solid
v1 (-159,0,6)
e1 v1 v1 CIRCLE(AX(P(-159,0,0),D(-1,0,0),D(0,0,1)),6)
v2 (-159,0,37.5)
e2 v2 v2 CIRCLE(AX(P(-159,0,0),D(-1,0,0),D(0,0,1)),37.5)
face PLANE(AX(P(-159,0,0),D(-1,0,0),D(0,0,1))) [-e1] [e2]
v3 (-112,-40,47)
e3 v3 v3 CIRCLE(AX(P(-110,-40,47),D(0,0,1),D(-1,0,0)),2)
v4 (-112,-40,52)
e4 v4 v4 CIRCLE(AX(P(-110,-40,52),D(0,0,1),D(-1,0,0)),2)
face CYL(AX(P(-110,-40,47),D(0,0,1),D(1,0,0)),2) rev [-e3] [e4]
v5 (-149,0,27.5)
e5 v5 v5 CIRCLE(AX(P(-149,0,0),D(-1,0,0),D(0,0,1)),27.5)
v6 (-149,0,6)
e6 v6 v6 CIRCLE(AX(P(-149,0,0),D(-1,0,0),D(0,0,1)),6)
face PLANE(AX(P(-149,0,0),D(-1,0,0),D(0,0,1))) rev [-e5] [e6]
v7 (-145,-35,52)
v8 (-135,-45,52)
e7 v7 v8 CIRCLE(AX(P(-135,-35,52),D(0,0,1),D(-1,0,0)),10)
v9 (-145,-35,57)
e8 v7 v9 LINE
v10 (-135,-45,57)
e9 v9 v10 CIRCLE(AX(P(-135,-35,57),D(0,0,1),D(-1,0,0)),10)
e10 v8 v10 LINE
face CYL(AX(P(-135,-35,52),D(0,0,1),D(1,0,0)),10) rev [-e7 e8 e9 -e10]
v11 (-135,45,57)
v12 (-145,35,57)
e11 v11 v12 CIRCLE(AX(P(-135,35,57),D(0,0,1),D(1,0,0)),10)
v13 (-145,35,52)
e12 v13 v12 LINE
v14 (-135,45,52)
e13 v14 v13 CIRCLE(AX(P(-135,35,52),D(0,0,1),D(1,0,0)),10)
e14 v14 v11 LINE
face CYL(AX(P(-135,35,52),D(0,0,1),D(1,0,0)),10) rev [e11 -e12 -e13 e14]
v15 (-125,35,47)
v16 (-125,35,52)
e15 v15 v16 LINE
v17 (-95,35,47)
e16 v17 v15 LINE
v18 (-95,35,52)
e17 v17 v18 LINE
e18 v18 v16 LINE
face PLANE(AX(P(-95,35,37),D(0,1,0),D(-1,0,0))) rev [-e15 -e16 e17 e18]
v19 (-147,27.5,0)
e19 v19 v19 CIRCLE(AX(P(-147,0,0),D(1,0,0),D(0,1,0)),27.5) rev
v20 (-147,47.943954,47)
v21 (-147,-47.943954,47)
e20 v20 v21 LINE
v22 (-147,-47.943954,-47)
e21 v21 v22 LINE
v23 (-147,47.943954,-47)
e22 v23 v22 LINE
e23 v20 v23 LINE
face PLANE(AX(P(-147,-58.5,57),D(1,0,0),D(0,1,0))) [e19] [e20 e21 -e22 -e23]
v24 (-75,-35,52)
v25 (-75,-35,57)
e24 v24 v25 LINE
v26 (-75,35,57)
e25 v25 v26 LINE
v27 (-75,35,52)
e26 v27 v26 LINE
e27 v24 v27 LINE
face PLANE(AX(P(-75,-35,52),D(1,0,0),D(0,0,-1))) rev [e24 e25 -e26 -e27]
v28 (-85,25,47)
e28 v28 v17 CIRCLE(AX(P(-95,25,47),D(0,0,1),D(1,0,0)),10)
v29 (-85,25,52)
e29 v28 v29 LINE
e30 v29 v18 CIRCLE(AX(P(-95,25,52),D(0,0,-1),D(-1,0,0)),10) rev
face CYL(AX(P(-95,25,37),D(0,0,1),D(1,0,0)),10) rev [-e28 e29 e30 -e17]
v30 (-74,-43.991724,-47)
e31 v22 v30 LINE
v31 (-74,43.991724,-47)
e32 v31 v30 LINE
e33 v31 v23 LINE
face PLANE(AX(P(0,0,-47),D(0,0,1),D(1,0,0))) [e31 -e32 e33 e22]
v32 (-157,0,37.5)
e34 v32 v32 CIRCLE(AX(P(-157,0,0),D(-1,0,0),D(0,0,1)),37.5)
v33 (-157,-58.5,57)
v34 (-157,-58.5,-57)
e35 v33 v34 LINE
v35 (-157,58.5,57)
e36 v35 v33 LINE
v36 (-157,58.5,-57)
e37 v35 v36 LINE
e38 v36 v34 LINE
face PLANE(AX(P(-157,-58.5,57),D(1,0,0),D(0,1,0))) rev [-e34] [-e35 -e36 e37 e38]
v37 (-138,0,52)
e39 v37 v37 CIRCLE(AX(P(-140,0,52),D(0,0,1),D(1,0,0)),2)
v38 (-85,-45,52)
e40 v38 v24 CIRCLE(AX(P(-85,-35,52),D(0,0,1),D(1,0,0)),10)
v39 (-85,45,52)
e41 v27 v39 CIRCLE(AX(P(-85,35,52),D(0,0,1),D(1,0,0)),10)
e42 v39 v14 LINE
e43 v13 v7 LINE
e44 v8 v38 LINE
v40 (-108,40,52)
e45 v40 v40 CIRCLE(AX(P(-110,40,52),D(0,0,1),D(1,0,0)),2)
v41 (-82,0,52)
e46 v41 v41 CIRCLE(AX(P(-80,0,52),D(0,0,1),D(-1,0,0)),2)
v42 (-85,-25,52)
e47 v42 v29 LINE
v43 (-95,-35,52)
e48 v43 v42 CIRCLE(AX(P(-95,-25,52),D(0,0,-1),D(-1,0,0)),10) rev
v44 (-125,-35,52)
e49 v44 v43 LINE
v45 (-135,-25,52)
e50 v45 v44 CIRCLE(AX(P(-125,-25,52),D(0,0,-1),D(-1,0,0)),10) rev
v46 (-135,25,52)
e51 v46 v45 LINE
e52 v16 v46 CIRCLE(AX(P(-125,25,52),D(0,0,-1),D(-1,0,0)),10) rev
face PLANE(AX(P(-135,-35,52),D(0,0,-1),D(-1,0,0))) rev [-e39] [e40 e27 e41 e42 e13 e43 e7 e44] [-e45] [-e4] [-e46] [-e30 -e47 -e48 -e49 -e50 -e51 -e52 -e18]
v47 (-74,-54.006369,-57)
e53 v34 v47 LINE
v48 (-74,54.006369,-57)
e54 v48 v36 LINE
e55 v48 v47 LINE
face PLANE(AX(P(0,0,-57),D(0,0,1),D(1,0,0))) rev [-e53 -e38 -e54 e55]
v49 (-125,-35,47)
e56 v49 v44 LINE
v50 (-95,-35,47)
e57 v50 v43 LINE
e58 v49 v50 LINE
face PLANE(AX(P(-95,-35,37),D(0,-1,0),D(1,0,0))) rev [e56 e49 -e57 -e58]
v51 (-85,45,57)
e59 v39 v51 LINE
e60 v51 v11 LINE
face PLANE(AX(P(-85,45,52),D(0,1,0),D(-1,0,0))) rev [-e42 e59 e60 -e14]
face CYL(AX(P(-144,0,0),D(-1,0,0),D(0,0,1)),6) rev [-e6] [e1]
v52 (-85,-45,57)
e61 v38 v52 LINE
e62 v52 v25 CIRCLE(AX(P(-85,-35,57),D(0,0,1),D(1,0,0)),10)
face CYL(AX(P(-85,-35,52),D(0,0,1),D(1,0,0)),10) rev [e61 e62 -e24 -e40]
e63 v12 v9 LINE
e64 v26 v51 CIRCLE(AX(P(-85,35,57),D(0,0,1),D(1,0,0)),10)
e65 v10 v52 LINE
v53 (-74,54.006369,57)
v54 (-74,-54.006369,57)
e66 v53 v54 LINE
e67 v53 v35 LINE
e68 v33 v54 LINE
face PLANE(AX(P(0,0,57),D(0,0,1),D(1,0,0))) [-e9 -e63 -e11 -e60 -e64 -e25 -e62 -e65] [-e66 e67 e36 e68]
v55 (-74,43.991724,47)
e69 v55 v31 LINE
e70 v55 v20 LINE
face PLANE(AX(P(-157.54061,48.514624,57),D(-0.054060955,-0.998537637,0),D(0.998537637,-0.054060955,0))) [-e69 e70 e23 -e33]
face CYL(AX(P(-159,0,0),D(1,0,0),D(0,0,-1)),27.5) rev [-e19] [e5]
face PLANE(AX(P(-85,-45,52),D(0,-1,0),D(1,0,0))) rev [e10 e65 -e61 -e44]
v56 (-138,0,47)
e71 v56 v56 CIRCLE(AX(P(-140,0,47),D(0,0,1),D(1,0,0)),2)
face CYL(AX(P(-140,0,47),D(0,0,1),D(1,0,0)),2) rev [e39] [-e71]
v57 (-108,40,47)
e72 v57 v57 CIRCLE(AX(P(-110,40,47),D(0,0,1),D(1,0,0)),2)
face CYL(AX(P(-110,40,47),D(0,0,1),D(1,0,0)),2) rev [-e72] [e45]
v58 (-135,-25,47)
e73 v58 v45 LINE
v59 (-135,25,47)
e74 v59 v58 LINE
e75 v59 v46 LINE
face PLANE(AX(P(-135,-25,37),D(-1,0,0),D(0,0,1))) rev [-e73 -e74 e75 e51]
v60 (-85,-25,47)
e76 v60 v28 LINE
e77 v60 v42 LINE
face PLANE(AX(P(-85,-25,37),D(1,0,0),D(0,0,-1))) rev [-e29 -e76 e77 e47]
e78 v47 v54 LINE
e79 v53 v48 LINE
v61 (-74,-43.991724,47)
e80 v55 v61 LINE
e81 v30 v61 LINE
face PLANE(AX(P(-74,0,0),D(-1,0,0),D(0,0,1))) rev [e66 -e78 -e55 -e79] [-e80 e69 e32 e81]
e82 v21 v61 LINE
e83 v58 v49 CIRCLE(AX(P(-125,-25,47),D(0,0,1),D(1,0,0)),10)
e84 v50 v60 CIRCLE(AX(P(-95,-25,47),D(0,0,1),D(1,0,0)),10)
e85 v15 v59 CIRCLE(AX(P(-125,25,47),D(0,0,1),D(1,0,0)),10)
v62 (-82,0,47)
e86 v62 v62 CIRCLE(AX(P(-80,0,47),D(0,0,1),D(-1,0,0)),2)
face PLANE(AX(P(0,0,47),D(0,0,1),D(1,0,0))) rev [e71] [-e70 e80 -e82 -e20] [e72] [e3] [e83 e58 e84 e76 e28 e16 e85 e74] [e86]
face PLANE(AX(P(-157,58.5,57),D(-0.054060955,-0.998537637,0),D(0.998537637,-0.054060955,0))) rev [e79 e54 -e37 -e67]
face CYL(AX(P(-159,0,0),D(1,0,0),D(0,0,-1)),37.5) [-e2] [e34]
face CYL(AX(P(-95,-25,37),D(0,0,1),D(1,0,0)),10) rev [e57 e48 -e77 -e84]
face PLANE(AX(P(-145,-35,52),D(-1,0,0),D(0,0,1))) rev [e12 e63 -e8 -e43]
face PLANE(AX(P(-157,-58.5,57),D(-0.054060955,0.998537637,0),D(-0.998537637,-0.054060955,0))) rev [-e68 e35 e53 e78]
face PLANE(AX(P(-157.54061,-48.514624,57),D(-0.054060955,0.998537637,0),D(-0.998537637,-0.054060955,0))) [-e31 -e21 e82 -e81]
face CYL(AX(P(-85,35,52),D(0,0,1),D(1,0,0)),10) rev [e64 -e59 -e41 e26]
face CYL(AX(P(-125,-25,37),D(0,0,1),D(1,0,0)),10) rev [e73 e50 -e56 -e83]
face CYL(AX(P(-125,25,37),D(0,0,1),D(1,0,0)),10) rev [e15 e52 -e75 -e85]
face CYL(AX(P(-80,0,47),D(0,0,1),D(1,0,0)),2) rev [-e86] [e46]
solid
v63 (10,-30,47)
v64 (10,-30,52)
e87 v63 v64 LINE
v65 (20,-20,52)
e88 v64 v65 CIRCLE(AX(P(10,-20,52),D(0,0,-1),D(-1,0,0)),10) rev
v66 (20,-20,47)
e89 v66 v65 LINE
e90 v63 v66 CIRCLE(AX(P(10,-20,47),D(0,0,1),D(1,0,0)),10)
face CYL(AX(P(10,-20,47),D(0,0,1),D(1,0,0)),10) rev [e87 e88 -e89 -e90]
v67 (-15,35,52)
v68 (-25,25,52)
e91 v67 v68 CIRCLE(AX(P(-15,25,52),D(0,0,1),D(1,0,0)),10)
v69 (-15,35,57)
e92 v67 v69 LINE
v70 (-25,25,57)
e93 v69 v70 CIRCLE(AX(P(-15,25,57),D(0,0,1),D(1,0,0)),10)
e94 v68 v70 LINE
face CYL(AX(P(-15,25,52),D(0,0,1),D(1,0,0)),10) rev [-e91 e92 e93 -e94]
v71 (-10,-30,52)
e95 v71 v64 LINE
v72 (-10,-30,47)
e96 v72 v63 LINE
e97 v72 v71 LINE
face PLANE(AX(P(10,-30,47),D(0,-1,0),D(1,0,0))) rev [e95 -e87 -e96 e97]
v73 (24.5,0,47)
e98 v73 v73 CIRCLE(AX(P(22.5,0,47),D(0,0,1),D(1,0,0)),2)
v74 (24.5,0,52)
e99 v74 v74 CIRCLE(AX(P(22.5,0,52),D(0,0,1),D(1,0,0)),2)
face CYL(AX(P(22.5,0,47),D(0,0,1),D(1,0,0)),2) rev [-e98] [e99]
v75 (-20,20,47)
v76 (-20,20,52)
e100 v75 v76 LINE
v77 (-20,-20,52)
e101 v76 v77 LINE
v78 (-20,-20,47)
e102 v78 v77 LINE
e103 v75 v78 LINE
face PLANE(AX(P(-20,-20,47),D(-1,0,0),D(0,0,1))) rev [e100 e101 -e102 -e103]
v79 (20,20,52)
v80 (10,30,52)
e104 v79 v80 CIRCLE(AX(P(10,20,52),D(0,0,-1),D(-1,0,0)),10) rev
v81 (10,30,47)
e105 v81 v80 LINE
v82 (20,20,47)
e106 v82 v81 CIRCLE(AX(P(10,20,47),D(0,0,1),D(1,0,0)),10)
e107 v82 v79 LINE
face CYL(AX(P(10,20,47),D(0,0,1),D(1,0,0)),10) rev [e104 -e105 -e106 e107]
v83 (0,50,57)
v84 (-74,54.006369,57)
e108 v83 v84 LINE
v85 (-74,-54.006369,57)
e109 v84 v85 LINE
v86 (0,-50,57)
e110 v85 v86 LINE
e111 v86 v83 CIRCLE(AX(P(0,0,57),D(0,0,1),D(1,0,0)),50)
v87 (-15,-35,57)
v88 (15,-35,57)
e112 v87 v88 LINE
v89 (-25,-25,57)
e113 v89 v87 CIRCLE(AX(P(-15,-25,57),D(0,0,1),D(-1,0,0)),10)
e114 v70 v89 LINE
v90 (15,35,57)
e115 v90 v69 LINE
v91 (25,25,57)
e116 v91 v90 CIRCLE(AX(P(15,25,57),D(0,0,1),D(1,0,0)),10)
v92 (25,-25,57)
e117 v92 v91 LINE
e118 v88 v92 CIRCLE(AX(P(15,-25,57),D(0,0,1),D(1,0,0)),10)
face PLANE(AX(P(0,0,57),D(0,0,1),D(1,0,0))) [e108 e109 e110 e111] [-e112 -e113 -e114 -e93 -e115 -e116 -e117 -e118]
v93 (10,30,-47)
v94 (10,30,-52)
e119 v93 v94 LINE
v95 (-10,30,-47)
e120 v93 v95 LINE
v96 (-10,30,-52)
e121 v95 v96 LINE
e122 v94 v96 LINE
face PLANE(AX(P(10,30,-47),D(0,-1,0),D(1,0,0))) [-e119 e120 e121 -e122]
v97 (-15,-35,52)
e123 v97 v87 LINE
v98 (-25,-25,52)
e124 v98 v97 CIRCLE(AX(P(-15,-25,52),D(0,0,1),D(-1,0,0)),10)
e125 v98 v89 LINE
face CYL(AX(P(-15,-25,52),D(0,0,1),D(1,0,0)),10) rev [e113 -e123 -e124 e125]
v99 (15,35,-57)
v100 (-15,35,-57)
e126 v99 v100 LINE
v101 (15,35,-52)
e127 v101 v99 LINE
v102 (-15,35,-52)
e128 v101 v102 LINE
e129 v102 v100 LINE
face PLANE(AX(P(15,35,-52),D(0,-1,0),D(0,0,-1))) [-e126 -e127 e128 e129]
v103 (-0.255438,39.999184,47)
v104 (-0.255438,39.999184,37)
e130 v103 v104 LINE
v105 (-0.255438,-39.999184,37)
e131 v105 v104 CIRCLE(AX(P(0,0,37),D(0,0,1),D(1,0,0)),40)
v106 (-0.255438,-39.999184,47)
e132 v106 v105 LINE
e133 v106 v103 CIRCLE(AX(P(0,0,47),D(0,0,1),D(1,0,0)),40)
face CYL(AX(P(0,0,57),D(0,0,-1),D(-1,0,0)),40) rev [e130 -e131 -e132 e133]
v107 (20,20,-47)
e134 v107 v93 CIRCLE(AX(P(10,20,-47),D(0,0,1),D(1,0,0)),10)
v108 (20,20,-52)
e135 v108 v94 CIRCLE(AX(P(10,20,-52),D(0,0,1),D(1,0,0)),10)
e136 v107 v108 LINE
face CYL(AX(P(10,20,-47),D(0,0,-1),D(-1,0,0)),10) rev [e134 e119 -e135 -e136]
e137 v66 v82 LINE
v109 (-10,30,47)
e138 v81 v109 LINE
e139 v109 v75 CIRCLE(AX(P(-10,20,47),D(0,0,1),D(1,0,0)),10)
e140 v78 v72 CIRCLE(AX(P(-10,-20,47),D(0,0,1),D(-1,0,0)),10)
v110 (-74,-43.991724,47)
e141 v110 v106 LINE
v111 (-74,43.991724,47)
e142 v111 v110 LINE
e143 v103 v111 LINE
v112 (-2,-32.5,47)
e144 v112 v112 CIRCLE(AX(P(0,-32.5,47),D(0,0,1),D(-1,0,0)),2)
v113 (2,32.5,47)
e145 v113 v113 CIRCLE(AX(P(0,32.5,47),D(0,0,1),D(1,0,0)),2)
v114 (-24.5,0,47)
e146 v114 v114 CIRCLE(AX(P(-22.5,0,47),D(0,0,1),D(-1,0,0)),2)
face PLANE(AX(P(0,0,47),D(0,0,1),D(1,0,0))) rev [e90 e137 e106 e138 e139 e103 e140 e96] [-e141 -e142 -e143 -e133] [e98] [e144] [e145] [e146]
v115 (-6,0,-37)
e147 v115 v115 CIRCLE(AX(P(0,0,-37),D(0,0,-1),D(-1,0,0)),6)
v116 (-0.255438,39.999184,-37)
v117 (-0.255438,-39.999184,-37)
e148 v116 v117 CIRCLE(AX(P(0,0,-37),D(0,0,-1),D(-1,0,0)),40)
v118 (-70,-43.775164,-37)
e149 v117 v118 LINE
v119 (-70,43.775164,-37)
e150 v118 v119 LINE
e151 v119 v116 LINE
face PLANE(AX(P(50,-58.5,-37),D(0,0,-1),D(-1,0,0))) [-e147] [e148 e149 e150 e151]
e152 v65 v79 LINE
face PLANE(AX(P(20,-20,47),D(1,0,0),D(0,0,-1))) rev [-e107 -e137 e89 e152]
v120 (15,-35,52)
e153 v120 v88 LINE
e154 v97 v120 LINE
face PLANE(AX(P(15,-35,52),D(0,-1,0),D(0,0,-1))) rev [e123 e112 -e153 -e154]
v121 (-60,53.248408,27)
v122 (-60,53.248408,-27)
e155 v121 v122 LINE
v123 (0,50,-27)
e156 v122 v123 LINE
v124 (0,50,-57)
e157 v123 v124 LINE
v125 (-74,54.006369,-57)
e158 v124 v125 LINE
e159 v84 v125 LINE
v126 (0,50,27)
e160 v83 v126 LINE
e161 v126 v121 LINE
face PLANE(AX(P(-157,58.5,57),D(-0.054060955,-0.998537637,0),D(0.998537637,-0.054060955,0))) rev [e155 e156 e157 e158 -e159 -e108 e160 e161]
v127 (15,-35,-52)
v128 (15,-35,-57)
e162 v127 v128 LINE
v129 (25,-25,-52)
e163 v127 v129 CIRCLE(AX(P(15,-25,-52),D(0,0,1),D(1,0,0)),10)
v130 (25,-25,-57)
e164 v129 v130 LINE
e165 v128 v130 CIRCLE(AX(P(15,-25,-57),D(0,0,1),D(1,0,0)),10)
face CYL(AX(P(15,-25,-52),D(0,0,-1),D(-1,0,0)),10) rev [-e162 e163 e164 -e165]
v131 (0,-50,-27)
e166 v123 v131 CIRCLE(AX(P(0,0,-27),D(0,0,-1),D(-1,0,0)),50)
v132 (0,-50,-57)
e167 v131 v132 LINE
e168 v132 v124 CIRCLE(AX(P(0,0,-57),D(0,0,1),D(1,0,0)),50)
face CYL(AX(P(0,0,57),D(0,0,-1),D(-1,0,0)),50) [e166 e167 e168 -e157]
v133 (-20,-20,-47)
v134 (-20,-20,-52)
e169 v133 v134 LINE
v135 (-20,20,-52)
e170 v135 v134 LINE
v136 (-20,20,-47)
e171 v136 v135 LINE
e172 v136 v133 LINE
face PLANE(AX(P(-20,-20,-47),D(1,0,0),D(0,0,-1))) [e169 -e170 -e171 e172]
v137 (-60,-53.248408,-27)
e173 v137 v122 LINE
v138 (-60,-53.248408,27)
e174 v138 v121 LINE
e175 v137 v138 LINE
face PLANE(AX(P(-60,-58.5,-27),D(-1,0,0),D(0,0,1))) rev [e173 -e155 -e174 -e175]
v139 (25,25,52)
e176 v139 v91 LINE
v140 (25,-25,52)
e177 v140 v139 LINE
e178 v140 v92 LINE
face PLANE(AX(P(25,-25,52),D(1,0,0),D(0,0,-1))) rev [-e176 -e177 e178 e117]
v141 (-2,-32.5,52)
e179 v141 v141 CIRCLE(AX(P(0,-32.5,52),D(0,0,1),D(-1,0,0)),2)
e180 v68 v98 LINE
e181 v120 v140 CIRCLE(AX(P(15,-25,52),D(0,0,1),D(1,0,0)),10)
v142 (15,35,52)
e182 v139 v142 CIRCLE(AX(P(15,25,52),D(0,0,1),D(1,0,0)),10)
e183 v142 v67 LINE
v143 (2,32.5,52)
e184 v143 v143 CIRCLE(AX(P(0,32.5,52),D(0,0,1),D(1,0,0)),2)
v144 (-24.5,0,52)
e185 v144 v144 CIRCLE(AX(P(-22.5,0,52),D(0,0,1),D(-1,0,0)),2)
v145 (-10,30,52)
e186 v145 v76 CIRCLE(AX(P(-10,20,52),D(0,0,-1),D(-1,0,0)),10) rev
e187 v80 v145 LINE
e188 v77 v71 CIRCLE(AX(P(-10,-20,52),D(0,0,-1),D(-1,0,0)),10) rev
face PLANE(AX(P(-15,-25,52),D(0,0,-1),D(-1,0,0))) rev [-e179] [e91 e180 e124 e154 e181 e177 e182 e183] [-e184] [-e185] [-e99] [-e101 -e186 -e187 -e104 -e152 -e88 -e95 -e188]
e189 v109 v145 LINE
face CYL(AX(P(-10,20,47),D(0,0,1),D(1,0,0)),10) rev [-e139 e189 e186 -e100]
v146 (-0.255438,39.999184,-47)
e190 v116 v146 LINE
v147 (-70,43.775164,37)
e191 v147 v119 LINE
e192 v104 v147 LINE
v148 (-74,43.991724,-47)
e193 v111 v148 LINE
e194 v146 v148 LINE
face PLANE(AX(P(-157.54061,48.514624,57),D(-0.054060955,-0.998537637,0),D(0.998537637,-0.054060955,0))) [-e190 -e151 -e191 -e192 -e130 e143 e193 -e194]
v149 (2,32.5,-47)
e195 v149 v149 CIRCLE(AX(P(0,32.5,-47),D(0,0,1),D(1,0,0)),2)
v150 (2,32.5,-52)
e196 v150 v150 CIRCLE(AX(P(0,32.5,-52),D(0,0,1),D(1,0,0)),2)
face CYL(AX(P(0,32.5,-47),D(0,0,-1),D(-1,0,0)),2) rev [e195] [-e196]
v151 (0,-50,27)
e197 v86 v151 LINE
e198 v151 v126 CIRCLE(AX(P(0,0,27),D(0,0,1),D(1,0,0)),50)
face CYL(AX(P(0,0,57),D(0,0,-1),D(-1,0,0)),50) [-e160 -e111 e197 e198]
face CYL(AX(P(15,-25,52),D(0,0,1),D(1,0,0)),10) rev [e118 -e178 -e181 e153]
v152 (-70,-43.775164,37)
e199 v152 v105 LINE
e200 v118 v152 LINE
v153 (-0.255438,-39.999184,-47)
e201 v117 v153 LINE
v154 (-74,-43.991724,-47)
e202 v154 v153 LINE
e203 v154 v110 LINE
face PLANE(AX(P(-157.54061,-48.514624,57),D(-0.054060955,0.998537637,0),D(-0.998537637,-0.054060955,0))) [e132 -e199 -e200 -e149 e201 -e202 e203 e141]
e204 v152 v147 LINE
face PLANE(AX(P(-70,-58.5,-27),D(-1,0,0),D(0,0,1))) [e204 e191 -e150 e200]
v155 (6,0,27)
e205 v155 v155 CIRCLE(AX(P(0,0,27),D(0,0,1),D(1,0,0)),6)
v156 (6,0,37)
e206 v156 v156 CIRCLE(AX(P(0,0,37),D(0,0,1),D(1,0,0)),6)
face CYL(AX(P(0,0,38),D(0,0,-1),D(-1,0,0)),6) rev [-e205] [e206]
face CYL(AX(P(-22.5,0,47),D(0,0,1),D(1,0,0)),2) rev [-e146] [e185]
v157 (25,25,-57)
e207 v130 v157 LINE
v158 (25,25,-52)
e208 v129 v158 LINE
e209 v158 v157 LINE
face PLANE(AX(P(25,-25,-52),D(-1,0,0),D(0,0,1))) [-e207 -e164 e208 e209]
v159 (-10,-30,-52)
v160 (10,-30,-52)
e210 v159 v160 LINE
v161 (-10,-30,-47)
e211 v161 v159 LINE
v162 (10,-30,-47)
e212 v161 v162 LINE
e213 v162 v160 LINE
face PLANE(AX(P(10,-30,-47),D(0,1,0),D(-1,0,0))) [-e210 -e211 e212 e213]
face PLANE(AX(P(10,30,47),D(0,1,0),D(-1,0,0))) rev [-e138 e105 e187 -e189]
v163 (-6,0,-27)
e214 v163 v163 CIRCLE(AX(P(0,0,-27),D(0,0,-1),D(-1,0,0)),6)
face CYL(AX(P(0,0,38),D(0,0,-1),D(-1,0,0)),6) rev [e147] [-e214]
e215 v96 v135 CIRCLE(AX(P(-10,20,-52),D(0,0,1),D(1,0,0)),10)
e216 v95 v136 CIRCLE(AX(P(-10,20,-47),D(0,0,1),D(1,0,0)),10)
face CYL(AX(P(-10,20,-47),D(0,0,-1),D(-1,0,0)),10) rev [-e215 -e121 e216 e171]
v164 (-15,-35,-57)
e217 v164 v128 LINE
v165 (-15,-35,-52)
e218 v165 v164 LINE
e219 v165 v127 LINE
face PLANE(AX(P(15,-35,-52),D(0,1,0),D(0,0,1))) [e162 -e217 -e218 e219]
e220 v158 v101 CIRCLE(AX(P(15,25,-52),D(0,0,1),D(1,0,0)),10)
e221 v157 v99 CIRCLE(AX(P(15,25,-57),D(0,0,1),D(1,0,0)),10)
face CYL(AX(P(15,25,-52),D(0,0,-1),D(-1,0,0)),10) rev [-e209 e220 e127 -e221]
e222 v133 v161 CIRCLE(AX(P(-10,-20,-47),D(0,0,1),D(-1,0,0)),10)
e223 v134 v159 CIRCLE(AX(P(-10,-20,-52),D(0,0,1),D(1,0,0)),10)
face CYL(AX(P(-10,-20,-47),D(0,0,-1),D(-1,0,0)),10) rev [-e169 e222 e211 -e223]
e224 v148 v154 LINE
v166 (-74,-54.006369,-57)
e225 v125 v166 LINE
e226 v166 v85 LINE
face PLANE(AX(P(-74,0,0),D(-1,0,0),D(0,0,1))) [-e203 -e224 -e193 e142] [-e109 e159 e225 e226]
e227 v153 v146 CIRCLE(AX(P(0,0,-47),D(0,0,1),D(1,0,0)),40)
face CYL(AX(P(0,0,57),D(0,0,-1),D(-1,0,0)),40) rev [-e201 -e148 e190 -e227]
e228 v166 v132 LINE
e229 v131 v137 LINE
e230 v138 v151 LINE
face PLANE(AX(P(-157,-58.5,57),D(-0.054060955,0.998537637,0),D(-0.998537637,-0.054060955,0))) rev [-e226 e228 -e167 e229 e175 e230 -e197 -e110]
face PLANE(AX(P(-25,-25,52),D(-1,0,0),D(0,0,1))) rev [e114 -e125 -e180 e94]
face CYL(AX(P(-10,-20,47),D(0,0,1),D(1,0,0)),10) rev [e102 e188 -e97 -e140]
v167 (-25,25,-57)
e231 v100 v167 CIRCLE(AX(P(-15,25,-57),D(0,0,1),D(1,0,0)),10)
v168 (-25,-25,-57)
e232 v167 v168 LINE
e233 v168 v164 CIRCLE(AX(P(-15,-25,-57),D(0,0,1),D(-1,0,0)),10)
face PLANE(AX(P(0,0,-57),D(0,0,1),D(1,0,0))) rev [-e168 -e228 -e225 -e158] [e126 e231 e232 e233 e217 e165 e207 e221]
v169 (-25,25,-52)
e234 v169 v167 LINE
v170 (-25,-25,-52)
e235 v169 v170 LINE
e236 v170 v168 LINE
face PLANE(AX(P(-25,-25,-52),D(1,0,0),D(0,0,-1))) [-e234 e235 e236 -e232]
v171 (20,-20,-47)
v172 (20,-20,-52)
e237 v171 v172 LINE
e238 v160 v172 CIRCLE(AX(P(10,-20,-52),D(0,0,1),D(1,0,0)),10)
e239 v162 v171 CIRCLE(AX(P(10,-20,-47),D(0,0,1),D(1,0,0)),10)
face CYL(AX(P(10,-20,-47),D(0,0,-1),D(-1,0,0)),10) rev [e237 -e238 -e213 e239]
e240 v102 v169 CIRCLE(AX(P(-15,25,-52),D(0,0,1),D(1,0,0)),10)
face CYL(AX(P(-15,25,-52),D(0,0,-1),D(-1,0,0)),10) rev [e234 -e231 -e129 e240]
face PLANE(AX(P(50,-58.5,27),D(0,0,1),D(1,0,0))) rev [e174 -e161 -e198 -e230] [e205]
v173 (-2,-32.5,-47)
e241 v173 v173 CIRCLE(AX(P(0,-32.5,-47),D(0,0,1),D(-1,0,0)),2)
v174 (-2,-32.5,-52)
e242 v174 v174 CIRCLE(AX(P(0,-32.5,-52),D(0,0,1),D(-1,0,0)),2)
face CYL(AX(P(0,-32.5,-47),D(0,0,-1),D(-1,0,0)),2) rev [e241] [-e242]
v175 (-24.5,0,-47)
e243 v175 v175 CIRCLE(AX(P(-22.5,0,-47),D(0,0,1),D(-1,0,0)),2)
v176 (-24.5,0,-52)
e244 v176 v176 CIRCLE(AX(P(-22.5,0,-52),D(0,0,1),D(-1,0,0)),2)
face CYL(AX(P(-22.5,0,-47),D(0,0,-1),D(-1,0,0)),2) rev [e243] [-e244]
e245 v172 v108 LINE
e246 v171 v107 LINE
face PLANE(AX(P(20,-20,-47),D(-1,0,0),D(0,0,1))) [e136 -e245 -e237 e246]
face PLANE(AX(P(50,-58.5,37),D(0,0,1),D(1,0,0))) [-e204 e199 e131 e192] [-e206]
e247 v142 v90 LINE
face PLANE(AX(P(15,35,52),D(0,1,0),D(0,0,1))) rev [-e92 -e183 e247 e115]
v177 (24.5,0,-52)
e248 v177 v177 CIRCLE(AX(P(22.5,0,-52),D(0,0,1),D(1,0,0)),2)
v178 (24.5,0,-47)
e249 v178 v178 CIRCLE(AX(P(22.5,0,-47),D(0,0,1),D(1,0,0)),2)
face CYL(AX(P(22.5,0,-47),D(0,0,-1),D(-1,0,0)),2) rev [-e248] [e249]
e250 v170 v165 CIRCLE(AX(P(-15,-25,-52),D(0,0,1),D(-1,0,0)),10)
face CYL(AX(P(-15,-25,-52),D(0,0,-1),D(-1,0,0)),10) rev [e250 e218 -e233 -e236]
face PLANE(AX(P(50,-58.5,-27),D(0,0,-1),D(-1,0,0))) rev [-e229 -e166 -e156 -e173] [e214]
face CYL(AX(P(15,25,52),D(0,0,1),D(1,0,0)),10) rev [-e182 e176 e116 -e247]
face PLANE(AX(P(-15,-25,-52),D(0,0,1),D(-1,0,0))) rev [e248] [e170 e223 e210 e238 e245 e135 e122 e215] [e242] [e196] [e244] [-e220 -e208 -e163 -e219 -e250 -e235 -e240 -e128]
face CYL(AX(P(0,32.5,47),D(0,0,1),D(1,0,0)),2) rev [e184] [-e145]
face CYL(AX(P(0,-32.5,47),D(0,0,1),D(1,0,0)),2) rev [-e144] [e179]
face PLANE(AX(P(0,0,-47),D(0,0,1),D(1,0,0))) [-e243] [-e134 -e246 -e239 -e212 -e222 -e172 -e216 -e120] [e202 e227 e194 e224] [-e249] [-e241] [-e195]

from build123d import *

# Parameters (mm, degrees)
RESSALTO_EXTRUS_O1_DEPTH   = 57
ESBO_O2_R                  = 37.5
RESSALTO_EXTRUS_O2_DEPTH   = 2
CORTE_EXTRUS_O1_DEPTH      = 179.751923067
CORTE_EXTRUS_O1_DEPTH_BACK = 179.751923067
ESBO_O3_W                  = 110
ESBO_O3_H                  = 54
CASCA2_START               = -47
CASCA2_DEPTH               = 94
CASCA2_2_DEPTH             = 10
CASCA2_START_2             = 37
CASCA2_3_DEPTH             = 10
CASCA2_START_3             = -149
CASCA2_4_OUTLINE_R         = 27.5
CASCA2_4_DEPTH             = 2
CORTE_EXTRUS_O2_DEPTH      = 20
CORTE_EXTRUS_O3_DEPTH      = 5
ESBO_O6_R                  = 2
CORTE_EXTRUS_O4_DEPTH      = 5
ESBO_O7_R                  = 6
CORTE_EXTRUS_O5_DEPTH      = 15
CORTE_EXTRUS_O6_DEPTH      = 10
CORTE_EXTRUS_O7_DEPTH      = 5
ESBO_O10_R                 = 2
CORTE_EXTRUS_O8_DEPTH      = 5
ESBO_O11_R                 = 6
CORTE_EXTRUS_O9_DEPTH      = 75


with BuildPart() as part:
    # Esboço1 → Ressalto-extrusão1 (new, symmetric)
    with BuildSketch(Plane.XY):
        with BuildLine():
            Line((-157, -58.5), (-157, 58.5))
            Line((-157, 58.5), (0, 50))
            ThreePointArc((0, 50), (50, 0), (0, -50))
            Line((0, -50), (-157, -58.5))
        make_face()
    extrude(amount=RESSALTO_EXTRUS_O1_DEPTH, both=True)

    # Esboço2 → Ressalto-extrusão2 (add)
    with BuildSketch(Plane.ZY.offset(157)):
        Circle(ESBO_O2_R)
    extrude(amount=RESSALTO_EXTRUS_O2_DEPTH)

    # Esboço3 → Corte-extrusão1 (cut, two sides: drawn at the far end of the back side and taken through both)
    with BuildSketch(Plane(origin=(0, 0, 0), x_dir=(1, 0, 0), z_dir=(0, 1, 0)).offset(-CORTE_EXTRUS_O1_DEPTH_BACK)):
        with Locations((-5, 0)):
            Rectangle(ESBO_O3_W, ESBO_O3_H)
    extrude(amount=CORTE_EXTRUS_O1_DEPTH + CORTE_EXTRUS_O1_DEPTH_BACK, mode=Mode.SUBTRACT)

    # Casca2: read off the stored shape, not the designer's step
    # Casca2 outline → Casca2 (cut)
    with BuildSketch(Plane.XY.offset(CASCA2_START)):
        Polygon((-70, -43.775163874), (-70, 43.775163874), (-147, 47.943953683), (-147, -47.943953683), align=None)
    extrude(amount=CASCA2_DEPTH, mode=Mode.SUBTRACT)

    # Casca2 2 outline → Casca2 2 (cut)
    with BuildSketch(Plane.XY.offset(CASCA2_START)):
        with BuildLine():
            ThreePointArc((-0.255437699, -39.999184386), (40, 0), (-0.255437699, 39.999184386))
            Line((-0.255437699, 39.999184386), (-70, 43.775163874))
            Line((-70, 43.775163874), (-70, -43.775163874))
            Line((-70, -43.775163874), (-0.255437699, -39.999184386))
        make_face()
    extrude(amount=CASCA2_2_DEPTH, mode=Mode.SUBTRACT)

    # Casca2 3 outline → Casca2 3 (cut)
    with BuildSketch(Plane.XY.offset(CASCA2_START_2)):
        with BuildLine():
            ThreePointArc((-0.255437699, -39.999184386), (40, 0), (-0.255437699, 39.999184386))
            Line((-0.255437699, 39.999184386), (-70, 43.775163874))
            Line((-70, 43.775163874), (-70, -43.775163874))
            Line((-70, -43.775163874), (-0.255437699, -39.999184386))
        make_face()
    extrude(amount=CASCA2_3_DEPTH, mode=Mode.SUBTRACT)

    # Casca2 4 outline → Casca2 4 (cut)
    with BuildSketch(Plane.YZ.offset(CASCA2_START_3)):
        Circle(CASCA2_4_OUTLINE_R)
    extrude(amount=CASCA2_4_DEPTH, mode=Mode.SUBTRACT)

    # Esboço4 → Corte-extrusão2 (cut)
    with BuildSketch(Plane.XY.offset(57)):
        with BuildLine():
            Line((-95, -35), (-125, -35))
            ThreePointArc((-125, -35), (-132.071067812, -32.071067812), (-135, -25))
            Line((-135, -25), (-135, 25))
            ThreePointArc((-135, 25), (-132.071067812, 32.071067812), (-125, 35))
            Line((-125, 35), (-95, 35))
            ThreePointArc((-95, 35), (-87.928932188, 32.071067812), (-85, 25))
            Line((-85, 25), (-85, -25))
            ThreePointArc((-85, -25), (-87.928932188, -32.071067812), (-95, -35))
        make_face()
    extrude(amount=-CORTE_EXTRUS_O2_DEPTH, mode=Mode.SUBTRACT)

    # Esboço5 → Corte-extrusão3 (cut)
    with BuildSketch(Plane.XY.offset(57)):
        with BuildLine():
            Line((-85, -45), (-135, -45))
            ThreePointArc((-135, -45), (-142.071067812, -42.071067812), (-145, -35))
            Line((-145, -35), (-145, 35))
            ThreePointArc((-145, 35), (-142.071067812, 42.071067812), (-135, 45))
            Line((-135, 45), (-85, 45))
            ThreePointArc((-85, 45), (-77.928932188, 42.071067812), (-75, 35))
            Line((-75, 35), (-75, -35))
            ThreePointArc((-75, -35), (-77.928932188, -42.071067812), (-85, -45))
        make_face()
    extrude(amount=-CORTE_EXTRUS_O3_DEPTH, mode=Mode.SUBTRACT)

    # Esboço6 → Corte-extrusão4 (cut)
    with BuildSketch(Plane.XY.offset(52)):
        with Locations((-110, 40)):
            Circle(ESBO_O6_R)
        with Locations((-140, 0)):
            Circle(ESBO_O6_R)
        with Locations(Location((-110, -40, 0), (0, 0, 180))):
            Circle(ESBO_O6_R)
        with Locations(Location((-80, 0, 0), (0, 0, 180))):
            Circle(ESBO_O6_R)
    extrude(amount=-CORTE_EXTRUS_O4_DEPTH, mode=Mode.SUBTRACT)

    # Esboço7 → Corte-extrusão5 (cut)
    with BuildSketch(Plane.ZY.offset(159)):
        Circle(ESBO_O7_R)
    extrude(amount=-CORTE_EXTRUS_O5_DEPTH, mode=Mode.SUBTRACT)

    # Esboço8 → Corte-extrusão6 (cut)
    with BuildSketch(Plane.XY.offset(57)):
        with BuildLine():
            Line((10, -30), (-10, -30))
            ThreePointArc((-10, -30), (-17.071067812, -27.071067812), (-20, -20))
            Line((-20, -20), (-20, 20))
            ThreePointArc((-20, 20), (-17.071067812, 27.071067812), (-10, 30))
            Line((-10, 30), (10, 30))
            ThreePointArc((10, 30), (17.071067812, 27.071067812), (20, 20))
            Line((20, 20), (20, -20))
            ThreePointArc((20, -20), (17.071067812, -27.071067812), (10, -30))
        make_face()
    corte_extrus_o6 = extrude(amount=-CORTE_EXTRUS_O6_DEPTH, mode=Mode.SUBTRACT)

    # Esboço9 → Corte-extrusão7 (cut)
    with BuildSketch(Plane.XY.offset(57)):
        with BuildLine():
            Line((15, -35), (-15, -35))
            ThreePointArc((-15, -35), (-22.071067812, -32.071067812), (-25, -25))
            Line((-25, -25), (-25, 25))
            ThreePointArc((-25, 25), (-22.071067812, 32.071067812), (-15, 35))
            Line((-15, 35), (15, 35))
            ThreePointArc((15, 35), (22.071067812, 32.071067812), (25, 25))
            Line((25, 25), (25, -25))
            ThreePointArc((25, -25), (22.071067812, -32.071067812), (15, -35))
        make_face()
    corte_extrus_o7 = extrude(amount=-CORTE_EXTRUS_O7_DEPTH, mode=Mode.SUBTRACT)

    # Esboço10 → Corte-extrusão8 (cut)
    with BuildSketch(Plane.XY.offset(52)):
        with Locations((0, 32.5)):
            Circle(ESBO_O10_R)
        with Locations((22.5, 0)):
            Circle(ESBO_O10_R)
        with Locations(Location((0, -32.5, 0), (0, 0, 180))):
            Circle(ESBO_O10_R)
        with Locations(Location((-22.5, 0, 0), (0, 0, 180))):
            Circle(ESBO_O10_R)
    corte_extrus_o8 = extrude(amount=-CORTE_EXTRUS_O8_DEPTH, mode=Mode.SUBTRACT)

    # Espelhar1: Corte-extrusão6, Corte-extrusão7, Corte-extrusão8 across plane
    add(corte_extrus_o6.mirror(Plane.XY), mode=Mode.SUBTRACT)
    add(corte_extrus_o7.mirror(Plane.XY), mode=Mode.SUBTRACT)
    add(corte_extrus_o8.mirror(Plane.XY), mode=Mode.SUBTRACT)

    # Esboço11 → Corte-extrusão9 (cut)
    with BuildSketch(Plane(origin=(0, 0, -37), x_dir=(-1, 0, 0), z_dir=(0, 0, -1))):
        with Locations(Location((0, 0, 0), (0, 0, 180))):
            Circle(ESBO_O11_R)
    extrude(amount=-CORTE_EXTRUS_O9_DEPTH, mode=Mode.SUBTRACT)


with BuildPart() as body_2:
    # Dividir3: the piece on the far side of the plane
    add(part.part)
    split(bisect_by=Plane(origin=(-74, 0, 0), x_dir=(0, 0, -1), z_dir=(-1, 0, 0)), keep=Keep.BOTTOM)


with BuildPart() as part_1:
    add(part.part)

    # Dividir3
    split(bisect_by=Plane(origin=(-74, 0, 0), x_dir=(0, 0, -1), z_dir=(-1, 0, 0)), keep=Keep.TOP)


solid = Compound([body_2.part, part_1.part])
